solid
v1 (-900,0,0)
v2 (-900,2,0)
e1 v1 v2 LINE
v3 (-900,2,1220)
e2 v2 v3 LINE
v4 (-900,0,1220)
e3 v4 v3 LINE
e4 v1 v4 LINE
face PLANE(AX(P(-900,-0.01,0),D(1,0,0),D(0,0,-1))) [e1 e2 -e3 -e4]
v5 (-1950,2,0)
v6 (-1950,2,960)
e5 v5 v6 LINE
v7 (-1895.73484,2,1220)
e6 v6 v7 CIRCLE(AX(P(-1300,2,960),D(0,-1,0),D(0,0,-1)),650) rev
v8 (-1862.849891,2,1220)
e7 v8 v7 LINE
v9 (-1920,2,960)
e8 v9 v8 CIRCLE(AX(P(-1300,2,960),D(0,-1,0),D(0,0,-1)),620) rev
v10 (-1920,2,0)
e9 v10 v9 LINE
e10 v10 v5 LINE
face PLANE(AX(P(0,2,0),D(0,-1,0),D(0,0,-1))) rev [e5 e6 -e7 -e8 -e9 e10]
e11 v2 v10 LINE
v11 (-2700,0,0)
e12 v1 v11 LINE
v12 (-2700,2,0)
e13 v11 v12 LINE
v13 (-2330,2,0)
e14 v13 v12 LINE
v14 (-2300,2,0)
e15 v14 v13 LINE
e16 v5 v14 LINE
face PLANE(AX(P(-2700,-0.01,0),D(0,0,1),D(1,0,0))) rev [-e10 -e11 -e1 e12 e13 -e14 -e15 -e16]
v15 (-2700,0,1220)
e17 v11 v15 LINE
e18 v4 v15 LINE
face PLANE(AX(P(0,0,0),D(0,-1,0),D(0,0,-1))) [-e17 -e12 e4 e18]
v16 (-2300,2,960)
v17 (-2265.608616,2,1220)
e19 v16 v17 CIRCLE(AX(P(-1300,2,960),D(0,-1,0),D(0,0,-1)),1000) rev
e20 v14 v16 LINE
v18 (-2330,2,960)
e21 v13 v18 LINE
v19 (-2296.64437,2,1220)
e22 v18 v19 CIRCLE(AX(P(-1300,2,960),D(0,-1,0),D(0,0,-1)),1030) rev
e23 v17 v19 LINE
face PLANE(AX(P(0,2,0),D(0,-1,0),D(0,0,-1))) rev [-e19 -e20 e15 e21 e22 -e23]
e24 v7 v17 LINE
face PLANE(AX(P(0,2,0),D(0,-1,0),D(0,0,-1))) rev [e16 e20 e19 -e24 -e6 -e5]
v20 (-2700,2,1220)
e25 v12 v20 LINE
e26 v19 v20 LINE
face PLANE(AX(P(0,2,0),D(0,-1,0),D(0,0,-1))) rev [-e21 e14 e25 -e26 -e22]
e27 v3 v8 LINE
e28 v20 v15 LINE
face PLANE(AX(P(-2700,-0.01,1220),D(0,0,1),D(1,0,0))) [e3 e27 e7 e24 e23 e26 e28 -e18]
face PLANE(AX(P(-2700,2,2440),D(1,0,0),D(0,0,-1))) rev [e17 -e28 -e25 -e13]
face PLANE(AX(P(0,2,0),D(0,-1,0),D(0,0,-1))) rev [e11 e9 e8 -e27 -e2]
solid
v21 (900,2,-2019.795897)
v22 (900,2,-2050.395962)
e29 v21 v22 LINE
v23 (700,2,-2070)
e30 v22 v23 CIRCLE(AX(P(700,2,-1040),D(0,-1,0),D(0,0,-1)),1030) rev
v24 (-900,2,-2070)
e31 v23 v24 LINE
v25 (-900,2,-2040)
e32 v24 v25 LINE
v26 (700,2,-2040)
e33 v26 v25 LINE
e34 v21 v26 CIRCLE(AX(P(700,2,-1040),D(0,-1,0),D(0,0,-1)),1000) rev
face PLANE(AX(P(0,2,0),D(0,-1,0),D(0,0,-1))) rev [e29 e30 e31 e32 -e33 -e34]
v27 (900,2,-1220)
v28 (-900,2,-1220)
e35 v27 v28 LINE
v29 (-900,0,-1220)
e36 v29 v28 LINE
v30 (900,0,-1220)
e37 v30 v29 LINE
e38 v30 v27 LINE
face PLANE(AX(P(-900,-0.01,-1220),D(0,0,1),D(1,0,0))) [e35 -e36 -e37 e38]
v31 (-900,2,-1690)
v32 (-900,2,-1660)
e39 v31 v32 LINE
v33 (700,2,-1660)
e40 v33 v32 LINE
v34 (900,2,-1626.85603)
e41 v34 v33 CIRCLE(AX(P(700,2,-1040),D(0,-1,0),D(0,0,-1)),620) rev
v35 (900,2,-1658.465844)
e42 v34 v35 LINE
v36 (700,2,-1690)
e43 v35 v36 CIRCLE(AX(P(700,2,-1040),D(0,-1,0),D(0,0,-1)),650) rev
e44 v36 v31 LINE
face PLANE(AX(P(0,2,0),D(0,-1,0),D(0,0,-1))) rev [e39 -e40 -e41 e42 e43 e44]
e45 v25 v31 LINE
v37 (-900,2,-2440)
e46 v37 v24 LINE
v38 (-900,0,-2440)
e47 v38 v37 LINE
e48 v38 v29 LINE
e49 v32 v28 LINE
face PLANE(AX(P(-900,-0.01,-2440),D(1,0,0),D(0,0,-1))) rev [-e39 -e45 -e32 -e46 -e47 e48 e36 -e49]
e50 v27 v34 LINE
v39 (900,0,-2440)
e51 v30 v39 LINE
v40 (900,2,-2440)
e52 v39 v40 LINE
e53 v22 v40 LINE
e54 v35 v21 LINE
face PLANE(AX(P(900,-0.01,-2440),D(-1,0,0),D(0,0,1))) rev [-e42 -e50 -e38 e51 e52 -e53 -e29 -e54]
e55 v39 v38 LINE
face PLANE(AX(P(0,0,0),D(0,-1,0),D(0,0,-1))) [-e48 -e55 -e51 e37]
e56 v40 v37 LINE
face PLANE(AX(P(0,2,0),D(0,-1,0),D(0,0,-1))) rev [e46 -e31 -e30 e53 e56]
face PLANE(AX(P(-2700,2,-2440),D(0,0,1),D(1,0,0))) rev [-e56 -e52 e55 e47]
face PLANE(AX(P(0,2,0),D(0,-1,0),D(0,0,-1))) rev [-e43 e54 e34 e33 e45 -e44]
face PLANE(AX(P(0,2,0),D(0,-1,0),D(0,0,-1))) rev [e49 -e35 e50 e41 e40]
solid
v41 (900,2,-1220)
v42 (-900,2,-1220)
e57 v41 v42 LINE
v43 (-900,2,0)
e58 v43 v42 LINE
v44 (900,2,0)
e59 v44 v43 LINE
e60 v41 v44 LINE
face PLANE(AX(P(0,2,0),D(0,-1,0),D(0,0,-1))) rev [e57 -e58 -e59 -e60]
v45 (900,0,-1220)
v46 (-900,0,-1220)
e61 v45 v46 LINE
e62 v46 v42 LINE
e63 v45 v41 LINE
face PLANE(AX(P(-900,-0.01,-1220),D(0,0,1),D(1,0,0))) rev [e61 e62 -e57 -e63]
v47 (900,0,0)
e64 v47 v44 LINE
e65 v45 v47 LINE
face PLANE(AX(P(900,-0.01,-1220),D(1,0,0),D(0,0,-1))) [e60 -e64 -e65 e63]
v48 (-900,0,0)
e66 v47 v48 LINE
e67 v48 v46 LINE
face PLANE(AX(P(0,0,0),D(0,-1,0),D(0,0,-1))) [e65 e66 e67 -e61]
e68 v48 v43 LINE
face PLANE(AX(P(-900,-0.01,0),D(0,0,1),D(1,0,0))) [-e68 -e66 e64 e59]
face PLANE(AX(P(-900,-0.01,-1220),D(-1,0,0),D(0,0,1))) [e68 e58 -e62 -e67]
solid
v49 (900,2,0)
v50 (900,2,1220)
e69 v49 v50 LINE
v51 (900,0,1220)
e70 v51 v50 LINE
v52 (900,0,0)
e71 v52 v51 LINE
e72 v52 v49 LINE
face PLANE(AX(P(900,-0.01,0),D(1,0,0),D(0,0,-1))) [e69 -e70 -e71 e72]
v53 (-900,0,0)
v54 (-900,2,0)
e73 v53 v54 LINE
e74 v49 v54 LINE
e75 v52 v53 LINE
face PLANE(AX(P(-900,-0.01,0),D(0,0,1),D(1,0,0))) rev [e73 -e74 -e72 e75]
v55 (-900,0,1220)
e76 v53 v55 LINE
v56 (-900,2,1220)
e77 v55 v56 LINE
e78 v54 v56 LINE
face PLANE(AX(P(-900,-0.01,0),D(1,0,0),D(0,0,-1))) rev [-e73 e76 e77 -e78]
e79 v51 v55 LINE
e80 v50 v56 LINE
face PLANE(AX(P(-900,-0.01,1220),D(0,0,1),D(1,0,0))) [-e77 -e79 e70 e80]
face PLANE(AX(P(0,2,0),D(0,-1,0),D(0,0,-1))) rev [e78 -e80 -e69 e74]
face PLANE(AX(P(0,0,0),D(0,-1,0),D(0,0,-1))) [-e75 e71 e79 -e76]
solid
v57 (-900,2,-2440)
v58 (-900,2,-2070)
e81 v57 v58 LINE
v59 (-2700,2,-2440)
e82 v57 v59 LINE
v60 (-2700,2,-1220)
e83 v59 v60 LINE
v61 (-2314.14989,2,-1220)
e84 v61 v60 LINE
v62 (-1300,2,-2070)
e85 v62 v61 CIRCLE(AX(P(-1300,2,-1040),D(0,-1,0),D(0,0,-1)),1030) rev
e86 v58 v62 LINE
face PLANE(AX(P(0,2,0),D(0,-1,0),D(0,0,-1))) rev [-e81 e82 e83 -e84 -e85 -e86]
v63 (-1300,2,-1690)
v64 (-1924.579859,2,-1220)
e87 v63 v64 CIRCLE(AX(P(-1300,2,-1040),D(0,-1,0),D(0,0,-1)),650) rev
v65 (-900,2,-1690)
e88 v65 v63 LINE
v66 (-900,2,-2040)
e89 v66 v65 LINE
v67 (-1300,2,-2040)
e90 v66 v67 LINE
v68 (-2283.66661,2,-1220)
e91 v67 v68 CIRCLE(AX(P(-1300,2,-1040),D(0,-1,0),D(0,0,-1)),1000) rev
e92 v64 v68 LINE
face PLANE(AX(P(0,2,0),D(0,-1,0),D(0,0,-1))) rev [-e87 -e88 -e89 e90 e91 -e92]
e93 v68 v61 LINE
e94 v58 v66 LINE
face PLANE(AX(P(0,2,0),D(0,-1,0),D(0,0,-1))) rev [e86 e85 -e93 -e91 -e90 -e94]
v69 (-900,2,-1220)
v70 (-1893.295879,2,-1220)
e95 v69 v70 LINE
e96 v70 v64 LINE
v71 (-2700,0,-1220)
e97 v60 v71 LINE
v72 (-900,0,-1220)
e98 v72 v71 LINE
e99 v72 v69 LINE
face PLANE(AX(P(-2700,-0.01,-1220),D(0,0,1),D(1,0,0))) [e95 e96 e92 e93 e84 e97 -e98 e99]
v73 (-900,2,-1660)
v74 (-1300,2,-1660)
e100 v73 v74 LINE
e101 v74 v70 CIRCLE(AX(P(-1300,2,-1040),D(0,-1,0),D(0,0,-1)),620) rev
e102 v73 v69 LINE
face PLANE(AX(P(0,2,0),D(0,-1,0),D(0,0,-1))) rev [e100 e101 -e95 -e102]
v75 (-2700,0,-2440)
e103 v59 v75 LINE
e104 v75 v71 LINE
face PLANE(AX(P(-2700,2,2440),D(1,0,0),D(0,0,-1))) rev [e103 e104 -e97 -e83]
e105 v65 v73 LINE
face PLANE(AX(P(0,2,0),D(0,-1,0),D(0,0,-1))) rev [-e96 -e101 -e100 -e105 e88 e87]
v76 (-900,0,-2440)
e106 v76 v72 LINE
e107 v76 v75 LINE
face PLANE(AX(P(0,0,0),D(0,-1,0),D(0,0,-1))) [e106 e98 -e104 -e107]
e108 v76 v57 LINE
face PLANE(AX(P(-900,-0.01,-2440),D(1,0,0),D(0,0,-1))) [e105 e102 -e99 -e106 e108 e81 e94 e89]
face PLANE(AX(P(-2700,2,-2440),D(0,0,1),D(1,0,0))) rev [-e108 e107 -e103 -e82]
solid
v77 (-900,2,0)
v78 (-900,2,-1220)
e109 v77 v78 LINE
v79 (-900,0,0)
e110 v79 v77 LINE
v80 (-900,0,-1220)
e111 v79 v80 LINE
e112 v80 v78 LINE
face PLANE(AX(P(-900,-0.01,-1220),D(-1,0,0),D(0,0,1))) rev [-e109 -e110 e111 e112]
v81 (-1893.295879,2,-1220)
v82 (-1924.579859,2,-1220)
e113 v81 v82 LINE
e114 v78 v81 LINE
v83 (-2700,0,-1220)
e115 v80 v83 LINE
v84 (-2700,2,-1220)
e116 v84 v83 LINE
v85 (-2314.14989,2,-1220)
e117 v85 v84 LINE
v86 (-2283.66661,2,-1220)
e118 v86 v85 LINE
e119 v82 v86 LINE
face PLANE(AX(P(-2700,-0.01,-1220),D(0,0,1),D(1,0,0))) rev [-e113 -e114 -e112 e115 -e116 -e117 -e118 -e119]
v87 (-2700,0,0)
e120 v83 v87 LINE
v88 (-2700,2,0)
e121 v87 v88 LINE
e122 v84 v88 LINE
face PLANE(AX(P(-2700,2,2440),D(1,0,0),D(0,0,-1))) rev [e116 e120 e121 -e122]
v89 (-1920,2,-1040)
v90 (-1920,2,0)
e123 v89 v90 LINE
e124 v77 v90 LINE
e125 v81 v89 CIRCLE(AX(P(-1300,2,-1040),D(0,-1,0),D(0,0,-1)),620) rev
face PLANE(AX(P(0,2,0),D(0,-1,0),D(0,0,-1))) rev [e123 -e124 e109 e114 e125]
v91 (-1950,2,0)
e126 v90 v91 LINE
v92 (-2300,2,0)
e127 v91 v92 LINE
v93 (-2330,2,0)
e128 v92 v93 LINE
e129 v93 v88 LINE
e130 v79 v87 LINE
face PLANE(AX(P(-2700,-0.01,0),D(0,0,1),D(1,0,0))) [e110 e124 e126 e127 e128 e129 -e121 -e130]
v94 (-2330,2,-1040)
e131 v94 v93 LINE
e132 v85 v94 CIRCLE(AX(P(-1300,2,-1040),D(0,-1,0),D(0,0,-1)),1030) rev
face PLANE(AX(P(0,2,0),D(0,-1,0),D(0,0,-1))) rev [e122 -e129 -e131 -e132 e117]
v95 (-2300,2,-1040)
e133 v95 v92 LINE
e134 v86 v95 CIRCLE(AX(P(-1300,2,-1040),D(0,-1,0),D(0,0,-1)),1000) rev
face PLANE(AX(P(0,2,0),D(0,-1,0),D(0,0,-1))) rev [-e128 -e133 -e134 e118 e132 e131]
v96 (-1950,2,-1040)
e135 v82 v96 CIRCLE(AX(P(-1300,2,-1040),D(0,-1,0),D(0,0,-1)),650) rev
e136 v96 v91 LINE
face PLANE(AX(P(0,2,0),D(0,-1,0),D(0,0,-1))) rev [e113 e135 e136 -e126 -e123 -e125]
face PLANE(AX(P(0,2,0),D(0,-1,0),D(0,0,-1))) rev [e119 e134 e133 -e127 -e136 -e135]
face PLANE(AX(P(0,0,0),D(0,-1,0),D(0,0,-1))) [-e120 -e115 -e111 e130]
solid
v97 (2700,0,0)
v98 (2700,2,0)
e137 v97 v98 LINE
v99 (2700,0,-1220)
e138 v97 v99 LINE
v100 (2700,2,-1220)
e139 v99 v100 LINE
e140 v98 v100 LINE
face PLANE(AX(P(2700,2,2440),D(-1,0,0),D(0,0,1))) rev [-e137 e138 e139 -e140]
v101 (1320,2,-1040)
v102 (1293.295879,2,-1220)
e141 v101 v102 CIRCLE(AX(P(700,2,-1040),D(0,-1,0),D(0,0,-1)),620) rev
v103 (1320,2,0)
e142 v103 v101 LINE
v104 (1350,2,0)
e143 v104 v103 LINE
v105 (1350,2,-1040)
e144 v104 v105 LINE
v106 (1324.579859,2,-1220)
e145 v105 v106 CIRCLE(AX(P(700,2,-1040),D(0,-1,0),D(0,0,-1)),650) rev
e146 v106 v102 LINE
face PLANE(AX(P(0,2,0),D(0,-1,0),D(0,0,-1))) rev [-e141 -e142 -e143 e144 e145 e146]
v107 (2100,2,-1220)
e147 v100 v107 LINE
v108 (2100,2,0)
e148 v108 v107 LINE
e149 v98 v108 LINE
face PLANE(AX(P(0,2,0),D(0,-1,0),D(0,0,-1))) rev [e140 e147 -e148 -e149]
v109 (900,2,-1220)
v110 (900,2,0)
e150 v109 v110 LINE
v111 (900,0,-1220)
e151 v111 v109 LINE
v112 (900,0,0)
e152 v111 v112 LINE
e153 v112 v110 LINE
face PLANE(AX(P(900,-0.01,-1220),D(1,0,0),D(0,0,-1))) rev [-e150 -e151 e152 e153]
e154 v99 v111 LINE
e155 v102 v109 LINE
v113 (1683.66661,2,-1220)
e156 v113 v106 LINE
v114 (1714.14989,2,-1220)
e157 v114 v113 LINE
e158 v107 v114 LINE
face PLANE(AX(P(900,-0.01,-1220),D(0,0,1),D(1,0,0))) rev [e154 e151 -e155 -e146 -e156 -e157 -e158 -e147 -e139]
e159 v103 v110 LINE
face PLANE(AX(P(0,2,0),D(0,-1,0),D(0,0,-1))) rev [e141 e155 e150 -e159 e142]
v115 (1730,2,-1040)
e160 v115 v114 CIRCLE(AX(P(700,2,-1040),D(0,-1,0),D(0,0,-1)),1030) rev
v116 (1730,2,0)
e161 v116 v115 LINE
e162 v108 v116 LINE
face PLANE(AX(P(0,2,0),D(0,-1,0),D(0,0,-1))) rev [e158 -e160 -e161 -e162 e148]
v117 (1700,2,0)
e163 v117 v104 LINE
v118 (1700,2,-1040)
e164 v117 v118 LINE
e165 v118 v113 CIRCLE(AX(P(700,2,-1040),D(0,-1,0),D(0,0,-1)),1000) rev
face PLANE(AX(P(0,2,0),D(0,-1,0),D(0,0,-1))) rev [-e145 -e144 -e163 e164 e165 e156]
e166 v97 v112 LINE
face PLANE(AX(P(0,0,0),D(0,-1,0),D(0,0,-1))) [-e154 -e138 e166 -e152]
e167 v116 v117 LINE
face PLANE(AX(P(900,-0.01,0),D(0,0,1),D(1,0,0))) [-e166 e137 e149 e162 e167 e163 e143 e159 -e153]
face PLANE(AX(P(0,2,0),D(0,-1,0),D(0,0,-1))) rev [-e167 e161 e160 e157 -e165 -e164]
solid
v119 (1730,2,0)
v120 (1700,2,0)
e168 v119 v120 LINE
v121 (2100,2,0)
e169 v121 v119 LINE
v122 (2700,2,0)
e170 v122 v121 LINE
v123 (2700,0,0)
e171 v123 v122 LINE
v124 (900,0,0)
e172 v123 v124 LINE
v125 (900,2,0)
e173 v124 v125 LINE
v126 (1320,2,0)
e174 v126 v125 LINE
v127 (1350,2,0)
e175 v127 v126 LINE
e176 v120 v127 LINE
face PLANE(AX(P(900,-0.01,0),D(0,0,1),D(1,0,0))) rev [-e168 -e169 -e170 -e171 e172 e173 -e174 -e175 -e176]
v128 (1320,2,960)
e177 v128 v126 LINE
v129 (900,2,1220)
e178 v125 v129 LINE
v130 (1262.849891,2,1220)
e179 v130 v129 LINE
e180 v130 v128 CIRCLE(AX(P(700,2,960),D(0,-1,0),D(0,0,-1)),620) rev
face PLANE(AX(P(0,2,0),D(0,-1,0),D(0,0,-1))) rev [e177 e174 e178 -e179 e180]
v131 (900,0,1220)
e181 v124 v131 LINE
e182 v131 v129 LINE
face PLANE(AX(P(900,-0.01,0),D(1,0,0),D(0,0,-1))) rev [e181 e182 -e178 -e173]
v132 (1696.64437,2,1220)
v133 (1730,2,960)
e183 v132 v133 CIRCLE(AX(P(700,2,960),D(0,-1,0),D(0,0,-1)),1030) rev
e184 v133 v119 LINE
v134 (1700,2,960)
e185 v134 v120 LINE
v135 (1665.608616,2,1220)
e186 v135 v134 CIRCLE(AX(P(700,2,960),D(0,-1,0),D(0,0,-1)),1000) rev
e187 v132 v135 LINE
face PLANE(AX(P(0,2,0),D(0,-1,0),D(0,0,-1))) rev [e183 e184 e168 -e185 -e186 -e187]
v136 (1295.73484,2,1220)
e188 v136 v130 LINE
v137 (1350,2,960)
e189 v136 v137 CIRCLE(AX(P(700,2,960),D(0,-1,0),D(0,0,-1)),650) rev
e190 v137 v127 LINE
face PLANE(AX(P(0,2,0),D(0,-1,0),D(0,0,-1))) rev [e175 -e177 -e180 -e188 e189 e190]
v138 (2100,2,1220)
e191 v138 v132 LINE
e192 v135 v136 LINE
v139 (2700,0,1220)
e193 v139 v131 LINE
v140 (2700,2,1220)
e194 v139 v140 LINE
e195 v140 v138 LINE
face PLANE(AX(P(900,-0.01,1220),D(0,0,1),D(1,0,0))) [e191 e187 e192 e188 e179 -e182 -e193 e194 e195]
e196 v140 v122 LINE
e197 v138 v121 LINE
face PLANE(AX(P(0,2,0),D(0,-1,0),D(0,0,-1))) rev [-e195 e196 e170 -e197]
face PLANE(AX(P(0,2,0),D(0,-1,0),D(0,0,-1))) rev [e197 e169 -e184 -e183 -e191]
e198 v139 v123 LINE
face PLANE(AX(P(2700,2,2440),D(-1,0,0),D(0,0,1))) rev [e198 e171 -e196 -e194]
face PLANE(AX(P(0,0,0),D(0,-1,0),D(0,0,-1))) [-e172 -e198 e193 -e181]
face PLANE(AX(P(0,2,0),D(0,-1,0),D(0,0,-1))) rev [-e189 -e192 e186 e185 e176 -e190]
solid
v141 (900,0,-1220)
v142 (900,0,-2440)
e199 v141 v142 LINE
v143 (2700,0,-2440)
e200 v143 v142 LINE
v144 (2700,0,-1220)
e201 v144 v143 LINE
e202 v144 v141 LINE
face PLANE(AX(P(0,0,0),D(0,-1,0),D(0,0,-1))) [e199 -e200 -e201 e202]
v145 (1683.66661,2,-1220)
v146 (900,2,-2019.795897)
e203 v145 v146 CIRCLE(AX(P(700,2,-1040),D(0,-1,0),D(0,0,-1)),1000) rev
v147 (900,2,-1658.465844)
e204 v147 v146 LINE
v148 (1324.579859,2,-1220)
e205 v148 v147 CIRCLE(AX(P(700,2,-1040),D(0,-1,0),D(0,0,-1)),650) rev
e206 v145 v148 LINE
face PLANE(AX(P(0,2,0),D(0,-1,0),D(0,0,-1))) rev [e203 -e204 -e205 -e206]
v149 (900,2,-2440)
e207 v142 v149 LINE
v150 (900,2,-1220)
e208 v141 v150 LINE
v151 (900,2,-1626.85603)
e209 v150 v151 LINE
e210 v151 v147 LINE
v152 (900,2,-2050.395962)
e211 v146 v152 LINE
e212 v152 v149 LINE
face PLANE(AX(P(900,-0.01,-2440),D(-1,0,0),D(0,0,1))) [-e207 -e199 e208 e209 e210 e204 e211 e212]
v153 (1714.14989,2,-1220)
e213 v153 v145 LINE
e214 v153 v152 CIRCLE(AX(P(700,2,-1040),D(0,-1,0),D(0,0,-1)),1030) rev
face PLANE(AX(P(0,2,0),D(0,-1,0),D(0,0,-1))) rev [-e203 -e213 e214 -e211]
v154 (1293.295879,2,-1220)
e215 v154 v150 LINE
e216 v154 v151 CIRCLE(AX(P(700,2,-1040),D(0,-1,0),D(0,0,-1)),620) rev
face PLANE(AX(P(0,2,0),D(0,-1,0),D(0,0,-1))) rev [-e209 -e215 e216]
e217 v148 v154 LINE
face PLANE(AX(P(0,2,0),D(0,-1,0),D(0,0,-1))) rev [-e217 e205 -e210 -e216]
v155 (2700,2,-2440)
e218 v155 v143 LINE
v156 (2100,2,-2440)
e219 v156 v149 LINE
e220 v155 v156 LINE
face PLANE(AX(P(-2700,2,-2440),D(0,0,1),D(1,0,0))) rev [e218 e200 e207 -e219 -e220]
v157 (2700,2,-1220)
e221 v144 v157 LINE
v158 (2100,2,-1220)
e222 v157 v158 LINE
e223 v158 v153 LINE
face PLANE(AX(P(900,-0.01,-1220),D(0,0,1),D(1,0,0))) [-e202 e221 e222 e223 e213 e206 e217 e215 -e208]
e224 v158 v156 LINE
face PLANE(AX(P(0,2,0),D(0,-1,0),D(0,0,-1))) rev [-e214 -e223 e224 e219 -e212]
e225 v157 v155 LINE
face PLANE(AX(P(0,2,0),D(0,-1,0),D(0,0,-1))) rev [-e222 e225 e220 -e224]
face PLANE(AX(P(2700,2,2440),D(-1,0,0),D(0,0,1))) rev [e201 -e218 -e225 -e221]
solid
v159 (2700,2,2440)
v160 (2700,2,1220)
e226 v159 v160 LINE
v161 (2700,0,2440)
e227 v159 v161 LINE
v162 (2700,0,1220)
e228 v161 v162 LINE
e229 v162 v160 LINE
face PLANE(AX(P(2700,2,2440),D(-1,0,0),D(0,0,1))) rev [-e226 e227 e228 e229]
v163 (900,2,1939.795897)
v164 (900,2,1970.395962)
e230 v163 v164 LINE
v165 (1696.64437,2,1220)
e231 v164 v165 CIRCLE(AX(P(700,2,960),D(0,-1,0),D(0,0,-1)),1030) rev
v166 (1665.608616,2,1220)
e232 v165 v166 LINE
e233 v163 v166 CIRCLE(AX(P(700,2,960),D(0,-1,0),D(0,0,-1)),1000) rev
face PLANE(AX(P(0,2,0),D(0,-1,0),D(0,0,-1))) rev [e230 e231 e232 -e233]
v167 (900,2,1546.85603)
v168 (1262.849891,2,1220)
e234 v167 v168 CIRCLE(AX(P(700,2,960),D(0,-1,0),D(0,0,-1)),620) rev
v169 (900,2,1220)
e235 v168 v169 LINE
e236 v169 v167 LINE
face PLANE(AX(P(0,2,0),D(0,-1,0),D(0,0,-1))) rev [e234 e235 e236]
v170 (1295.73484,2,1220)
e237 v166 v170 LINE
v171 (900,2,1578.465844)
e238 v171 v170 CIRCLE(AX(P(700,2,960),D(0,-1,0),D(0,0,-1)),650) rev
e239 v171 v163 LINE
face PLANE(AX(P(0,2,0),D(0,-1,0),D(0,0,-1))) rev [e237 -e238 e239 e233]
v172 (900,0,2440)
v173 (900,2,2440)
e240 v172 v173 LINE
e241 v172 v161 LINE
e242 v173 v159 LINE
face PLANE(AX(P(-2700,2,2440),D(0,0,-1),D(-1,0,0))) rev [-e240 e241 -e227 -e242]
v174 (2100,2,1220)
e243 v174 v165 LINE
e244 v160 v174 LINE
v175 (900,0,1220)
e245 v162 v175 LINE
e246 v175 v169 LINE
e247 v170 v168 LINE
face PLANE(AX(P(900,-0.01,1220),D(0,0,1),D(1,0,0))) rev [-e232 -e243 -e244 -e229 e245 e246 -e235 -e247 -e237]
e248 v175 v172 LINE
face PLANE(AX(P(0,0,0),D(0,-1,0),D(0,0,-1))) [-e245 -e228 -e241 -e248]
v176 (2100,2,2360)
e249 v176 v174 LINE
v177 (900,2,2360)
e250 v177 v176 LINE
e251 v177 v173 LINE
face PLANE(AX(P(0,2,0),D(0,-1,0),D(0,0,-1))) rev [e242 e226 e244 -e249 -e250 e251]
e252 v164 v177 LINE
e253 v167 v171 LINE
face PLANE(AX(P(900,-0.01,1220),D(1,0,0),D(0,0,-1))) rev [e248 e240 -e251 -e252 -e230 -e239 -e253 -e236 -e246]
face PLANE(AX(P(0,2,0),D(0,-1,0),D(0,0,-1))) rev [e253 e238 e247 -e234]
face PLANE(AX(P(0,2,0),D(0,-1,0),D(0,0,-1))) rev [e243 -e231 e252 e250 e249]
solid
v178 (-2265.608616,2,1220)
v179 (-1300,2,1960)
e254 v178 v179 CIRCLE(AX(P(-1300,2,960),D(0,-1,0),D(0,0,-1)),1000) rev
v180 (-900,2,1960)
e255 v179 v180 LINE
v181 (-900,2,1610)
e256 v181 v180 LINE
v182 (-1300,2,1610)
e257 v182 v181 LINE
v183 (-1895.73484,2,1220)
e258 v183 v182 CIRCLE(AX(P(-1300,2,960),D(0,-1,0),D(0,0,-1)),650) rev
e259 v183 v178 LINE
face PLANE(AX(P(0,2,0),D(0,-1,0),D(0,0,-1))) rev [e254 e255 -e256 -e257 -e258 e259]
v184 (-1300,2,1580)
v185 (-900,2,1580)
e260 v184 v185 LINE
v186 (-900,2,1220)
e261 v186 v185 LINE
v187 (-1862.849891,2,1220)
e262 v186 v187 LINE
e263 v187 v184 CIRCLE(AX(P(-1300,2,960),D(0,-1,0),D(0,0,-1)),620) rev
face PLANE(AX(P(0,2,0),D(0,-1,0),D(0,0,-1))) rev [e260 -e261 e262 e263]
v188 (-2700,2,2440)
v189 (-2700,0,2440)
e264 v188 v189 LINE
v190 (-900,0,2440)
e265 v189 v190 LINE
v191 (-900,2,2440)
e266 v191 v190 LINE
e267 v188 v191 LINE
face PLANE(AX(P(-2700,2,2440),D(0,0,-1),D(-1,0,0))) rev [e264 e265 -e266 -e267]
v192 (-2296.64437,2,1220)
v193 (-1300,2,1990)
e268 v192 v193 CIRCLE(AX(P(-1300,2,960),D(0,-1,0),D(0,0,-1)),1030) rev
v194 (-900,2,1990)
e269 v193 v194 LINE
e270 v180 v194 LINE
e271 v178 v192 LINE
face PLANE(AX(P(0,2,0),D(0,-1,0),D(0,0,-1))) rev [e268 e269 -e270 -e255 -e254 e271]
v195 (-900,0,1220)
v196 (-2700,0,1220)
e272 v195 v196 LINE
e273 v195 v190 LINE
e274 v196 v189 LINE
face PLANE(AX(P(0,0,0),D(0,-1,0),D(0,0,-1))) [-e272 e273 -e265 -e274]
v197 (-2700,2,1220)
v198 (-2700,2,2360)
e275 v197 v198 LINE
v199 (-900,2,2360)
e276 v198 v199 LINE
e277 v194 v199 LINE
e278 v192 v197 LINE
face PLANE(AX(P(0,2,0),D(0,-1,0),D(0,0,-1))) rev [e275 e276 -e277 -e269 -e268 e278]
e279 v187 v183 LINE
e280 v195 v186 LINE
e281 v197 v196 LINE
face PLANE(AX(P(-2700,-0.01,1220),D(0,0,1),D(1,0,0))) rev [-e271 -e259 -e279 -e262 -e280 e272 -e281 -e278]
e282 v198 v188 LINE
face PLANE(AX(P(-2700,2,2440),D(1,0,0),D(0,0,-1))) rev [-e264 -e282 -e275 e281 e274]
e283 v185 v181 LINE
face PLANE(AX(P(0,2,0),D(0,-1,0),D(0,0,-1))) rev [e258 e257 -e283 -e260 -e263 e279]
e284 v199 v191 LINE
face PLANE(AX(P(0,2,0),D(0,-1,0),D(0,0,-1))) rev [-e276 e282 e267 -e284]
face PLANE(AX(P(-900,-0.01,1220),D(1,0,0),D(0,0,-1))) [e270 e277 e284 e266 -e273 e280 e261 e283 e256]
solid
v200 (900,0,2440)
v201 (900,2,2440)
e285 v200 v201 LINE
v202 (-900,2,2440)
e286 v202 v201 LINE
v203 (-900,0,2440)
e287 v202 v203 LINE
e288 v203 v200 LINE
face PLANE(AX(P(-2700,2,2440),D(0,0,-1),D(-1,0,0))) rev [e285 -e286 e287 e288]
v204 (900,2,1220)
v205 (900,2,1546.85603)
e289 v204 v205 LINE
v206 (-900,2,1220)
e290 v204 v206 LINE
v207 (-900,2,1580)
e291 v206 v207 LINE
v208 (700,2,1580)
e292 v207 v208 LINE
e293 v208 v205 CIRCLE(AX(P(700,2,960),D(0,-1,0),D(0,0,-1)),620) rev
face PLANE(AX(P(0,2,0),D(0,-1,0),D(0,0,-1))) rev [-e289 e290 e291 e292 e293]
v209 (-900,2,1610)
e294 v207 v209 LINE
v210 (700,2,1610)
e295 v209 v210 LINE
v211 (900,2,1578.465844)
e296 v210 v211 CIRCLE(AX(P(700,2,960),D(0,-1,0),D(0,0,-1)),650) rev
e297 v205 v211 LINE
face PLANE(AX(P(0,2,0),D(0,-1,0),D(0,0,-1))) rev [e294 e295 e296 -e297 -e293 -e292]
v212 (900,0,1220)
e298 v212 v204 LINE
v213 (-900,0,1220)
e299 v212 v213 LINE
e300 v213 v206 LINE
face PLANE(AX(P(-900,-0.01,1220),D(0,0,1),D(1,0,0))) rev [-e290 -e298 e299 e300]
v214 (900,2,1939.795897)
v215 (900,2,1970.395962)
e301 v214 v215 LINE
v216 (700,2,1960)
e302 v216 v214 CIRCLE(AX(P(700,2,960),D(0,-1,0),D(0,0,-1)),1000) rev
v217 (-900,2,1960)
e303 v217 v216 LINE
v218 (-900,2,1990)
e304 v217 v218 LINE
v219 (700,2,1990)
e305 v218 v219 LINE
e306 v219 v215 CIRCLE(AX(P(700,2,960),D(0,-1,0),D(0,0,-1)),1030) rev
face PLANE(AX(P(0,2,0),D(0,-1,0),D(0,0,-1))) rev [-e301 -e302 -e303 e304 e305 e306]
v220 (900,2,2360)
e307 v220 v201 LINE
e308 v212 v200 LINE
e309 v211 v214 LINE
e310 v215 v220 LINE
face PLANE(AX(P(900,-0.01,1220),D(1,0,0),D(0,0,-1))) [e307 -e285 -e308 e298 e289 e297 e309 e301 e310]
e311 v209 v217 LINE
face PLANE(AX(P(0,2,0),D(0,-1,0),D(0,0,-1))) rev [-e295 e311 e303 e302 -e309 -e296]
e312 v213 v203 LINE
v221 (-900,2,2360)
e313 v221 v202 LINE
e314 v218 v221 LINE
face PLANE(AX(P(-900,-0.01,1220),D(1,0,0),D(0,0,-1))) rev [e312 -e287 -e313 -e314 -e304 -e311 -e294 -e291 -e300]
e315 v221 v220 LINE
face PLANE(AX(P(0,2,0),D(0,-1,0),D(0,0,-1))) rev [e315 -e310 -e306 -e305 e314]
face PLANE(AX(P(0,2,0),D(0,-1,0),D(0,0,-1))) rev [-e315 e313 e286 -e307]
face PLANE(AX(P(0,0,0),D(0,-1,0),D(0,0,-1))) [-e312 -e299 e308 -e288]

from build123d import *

# Parameters (mm, degrees)
SKETCH1_W           = 5400
SKETCH1_H           = 4880
BOSS_EXTRUDE1_DEPTH = 2
SPLIT1_START        = 900
SPLIT1_OUTLINE_W    = 2
SPLIT1_OUTLINE_H    = 1220
SPLIT1_DEPTH        = 1800
SPLIT1_2_OUTLINE_W  = 2
SPLIT1_2_OUTLINE_H  = 1220
SPLIT1_2_DEPTH      = 1800
SPLIT1_3_OUTLINE_W  = 2
SPLIT1_3_OUTLINE_H  = 1220
SPLIT1_3_DEPTH      = 1800
SPLIT1_START_2      = 1220
SPLIT1_4_OUTLINE_W  = 1800
SPLIT1_4_OUTLINE_H  = 2
SPLIT1_4_DEPTH      = 1220
SPLIT1_5_OUTLINE_W  = 2
SPLIT1_5_OUTLINE_H  = 1220
SPLIT1_5_DEPTH      = 1800
SPLIT1_START_3      = -2700
SPLIT1_6_OUTLINE_W  = 2
SPLIT1_6_OUTLINE_H  = 3660
SPLIT1_6_DEPTH      = 5400
SPLIT1_7_OUTLINE_W  = 2
SPLIT1_7_OUTLINE_H  = 1220
SPLIT1_7_DEPTH      = 1800
SPLIT1_8_OUTLINE_W  = 2
SPLIT1_8_OUTLINE_H  = 1220
SPLIT1_8_DEPTH      = 1800
SPLIT1_9_OUTLINE_W  = 1800
SPLIT1_9_OUTLINE_H  = 2
SPLIT1_9_DEPTH      = 1220
SPLIT1_START_4      = -900
SPLIT1_10_OUTLINE_W = 2
SPLIT1_10_OUTLINE_H = 1220
SPLIT1_10_DEPTH     = 1800
SPLIT1_START_5      = -1220
SPLIT1_11_OUTLINE_W = 1800
SPLIT1_11_OUTLINE_H = 2
SPLIT1_11_DEPTH     = 1220
SPLIT1_12_OUTLINE_W = 1800
SPLIT1_12_OUTLINE_H = 2
SPLIT1_12_DEPTH     = 1220
SPLIT1_13_OUTLINE_W = 1800
SPLIT1_13_OUTLINE_H = 2
SPLIT1_13_DEPTH     = 1220
SPLIT1_START_6      = -2440
SPLIT1_14_OUTLINE_W = 1800
SPLIT1_14_OUTLINE_H = 2
SPLIT1_14_DEPTH     = 1220


# Read off the part's stored shape, not the designer's step: Split1
with BuildPart() as part:
    # Sketch1 → Boss-Extrude1 (new body)
    with BuildSketch(Plane(origin=(0, 0, 0), x_dir=(1, 0, 0), z_dir=(0, 1, 0))):
        Rectangle(SKETCH1_W, SKETCH1_H)
    extrude(amount=BOSS_EXTRUDE1_DEPTH)

    # Split1 6 outline → Split1 6 (cut)
    with BuildSketch(Plane.YZ.offset(SPLIT1_START_3)):
        with Locations((1, 610)):
            Rectangle(SPLIT1_6_OUTLINE_W, SPLIT1_6_OUTLINE_H)
    extrude(amount=SPLIT1_6_DEPTH, mode=Mode.SUBTRACT)

    # Split1 7 outline → Split1 7 (cut)
    with BuildSketch(Plane.YZ.offset(SPLIT1_START_3)):
        with Locations((1, -1830)):
            Rectangle(SPLIT1_7_OUTLINE_W, SPLIT1_7_OUTLINE_H)
    extrude(amount=SPLIT1_7_DEPTH, mode=Mode.SUBTRACT)

    # Split1 8 outline → Split1 8 (cut)
    with BuildSketch(Plane.YZ.offset(SPLIT1_START)):
        with Locations((1, -1830)):
            Rectangle(SPLIT1_8_OUTLINE_W, SPLIT1_8_OUTLINE_H)
    extrude(amount=SPLIT1_8_DEPTH, mode=Mode.SUBTRACT)


with BuildPart() as body_2:
    # Split1 outline → Split1 (new body)
    with BuildSketch(Plane.YZ.offset(SPLIT1_START)):
        with Locations((1, -1830)):
            Rectangle(SPLIT1_OUTLINE_W, SPLIT1_OUTLINE_H)
    extrude(amount=SPLIT1_DEPTH)


with BuildPart() as body_3:
    # Split1 2 outline → Split1 2 (new body)
    with BuildSketch(Plane.YZ.offset(SPLIT1_START)):
        with Locations((1, 1830)):
            Rectangle(SPLIT1_2_OUTLINE_W, SPLIT1_2_OUTLINE_H)
    extrude(amount=SPLIT1_2_DEPTH)


with BuildPart() as body_4:
    # Split1 3 outline → Split1 3 (new body)
    with BuildSketch(Plane.YZ.offset(SPLIT1_START)):
        with Locations((1, 610)):
            Rectangle(SPLIT1_3_OUTLINE_W, SPLIT1_3_OUTLINE_H)
    extrude(amount=SPLIT1_3_DEPTH)


with BuildPart() as body_5:
    # Split1 4 outline → Split1 4 (new body)
    with BuildSketch(Plane.XY.offset(SPLIT1_START_2)):
        with Locations((-1800, 1)):
            Rectangle(SPLIT1_4_OUTLINE_W, SPLIT1_4_OUTLINE_H)
    extrude(amount=SPLIT1_4_DEPTH)


with BuildPart() as body_6:
    # Split1 5 outline → Split1 5 (new body)
    with BuildSketch(Plane.YZ.offset(SPLIT1_START)):
        with Locations((1, -610)):
            Rectangle(SPLIT1_5_OUTLINE_W, SPLIT1_5_OUTLINE_H)
    extrude(amount=SPLIT1_5_DEPTH)


with BuildPart() as body_7:
    # Split1 9 outline → Split1 9 (new body)
    with BuildSketch(Plane.XY):
        with Locations((-1800, 1)):
            Rectangle(SPLIT1_9_OUTLINE_W, SPLIT1_9_OUTLINE_H)
    extrude(amount=SPLIT1_9_DEPTH)


with BuildPart() as body_8:
    # Split1 10 outline → Split1 10 (new body)
    with BuildSketch(Plane.YZ.offset(SPLIT1_START_4)):
        with Locations((1, 1830)):
            Rectangle(SPLIT1_10_OUTLINE_W, SPLIT1_10_OUTLINE_H)
    extrude(amount=SPLIT1_10_DEPTH)


with BuildPart() as body_9:
    # Split1 11 outline → Split1 11 (new body)
    with BuildSketch(Plane.XY.offset(SPLIT1_START_5)):
        with Locations((-1800, 1)):
            Rectangle(SPLIT1_11_OUTLINE_W, SPLIT1_11_OUTLINE_H)
    extrude(amount=SPLIT1_11_DEPTH)


with BuildPart() as body_10:
    # Split1 12 outline → Split1 12 (new body)
    with BuildSketch(Plane.XY):
        with Locations((0, 1)):
            Rectangle(SPLIT1_12_OUTLINE_W, SPLIT1_12_OUTLINE_H)
    extrude(amount=SPLIT1_12_DEPTH)


with BuildPart() as body_11:
    # Split1 13 outline → Split1 13 (new body)
    with BuildSketch(Plane.XY.offset(SPLIT1_START_5)):
        with Locations((0, 1)):
            Rectangle(SPLIT1_13_OUTLINE_W, SPLIT1_13_OUTLINE_H)
    extrude(amount=SPLIT1_13_DEPTH)


with BuildPart() as body_12:
    # Split1 14 outline → Split1 14 (new body)
    with BuildSketch(Plane.XY.offset(SPLIT1_START_6)):
        with Locations((-1800, 1)):
            Rectangle(SPLIT1_14_OUTLINE_W, SPLIT1_14_OUTLINE_H)
    extrude(amount=SPLIT1_14_DEPTH)


solid = Compound([part.part, body_2.part, body_3.part, body_4.part, body_5.part, body_6.part, body_7.part, body_8.part, body_9.part, body_10.part, body_11.part, body_12.part])
